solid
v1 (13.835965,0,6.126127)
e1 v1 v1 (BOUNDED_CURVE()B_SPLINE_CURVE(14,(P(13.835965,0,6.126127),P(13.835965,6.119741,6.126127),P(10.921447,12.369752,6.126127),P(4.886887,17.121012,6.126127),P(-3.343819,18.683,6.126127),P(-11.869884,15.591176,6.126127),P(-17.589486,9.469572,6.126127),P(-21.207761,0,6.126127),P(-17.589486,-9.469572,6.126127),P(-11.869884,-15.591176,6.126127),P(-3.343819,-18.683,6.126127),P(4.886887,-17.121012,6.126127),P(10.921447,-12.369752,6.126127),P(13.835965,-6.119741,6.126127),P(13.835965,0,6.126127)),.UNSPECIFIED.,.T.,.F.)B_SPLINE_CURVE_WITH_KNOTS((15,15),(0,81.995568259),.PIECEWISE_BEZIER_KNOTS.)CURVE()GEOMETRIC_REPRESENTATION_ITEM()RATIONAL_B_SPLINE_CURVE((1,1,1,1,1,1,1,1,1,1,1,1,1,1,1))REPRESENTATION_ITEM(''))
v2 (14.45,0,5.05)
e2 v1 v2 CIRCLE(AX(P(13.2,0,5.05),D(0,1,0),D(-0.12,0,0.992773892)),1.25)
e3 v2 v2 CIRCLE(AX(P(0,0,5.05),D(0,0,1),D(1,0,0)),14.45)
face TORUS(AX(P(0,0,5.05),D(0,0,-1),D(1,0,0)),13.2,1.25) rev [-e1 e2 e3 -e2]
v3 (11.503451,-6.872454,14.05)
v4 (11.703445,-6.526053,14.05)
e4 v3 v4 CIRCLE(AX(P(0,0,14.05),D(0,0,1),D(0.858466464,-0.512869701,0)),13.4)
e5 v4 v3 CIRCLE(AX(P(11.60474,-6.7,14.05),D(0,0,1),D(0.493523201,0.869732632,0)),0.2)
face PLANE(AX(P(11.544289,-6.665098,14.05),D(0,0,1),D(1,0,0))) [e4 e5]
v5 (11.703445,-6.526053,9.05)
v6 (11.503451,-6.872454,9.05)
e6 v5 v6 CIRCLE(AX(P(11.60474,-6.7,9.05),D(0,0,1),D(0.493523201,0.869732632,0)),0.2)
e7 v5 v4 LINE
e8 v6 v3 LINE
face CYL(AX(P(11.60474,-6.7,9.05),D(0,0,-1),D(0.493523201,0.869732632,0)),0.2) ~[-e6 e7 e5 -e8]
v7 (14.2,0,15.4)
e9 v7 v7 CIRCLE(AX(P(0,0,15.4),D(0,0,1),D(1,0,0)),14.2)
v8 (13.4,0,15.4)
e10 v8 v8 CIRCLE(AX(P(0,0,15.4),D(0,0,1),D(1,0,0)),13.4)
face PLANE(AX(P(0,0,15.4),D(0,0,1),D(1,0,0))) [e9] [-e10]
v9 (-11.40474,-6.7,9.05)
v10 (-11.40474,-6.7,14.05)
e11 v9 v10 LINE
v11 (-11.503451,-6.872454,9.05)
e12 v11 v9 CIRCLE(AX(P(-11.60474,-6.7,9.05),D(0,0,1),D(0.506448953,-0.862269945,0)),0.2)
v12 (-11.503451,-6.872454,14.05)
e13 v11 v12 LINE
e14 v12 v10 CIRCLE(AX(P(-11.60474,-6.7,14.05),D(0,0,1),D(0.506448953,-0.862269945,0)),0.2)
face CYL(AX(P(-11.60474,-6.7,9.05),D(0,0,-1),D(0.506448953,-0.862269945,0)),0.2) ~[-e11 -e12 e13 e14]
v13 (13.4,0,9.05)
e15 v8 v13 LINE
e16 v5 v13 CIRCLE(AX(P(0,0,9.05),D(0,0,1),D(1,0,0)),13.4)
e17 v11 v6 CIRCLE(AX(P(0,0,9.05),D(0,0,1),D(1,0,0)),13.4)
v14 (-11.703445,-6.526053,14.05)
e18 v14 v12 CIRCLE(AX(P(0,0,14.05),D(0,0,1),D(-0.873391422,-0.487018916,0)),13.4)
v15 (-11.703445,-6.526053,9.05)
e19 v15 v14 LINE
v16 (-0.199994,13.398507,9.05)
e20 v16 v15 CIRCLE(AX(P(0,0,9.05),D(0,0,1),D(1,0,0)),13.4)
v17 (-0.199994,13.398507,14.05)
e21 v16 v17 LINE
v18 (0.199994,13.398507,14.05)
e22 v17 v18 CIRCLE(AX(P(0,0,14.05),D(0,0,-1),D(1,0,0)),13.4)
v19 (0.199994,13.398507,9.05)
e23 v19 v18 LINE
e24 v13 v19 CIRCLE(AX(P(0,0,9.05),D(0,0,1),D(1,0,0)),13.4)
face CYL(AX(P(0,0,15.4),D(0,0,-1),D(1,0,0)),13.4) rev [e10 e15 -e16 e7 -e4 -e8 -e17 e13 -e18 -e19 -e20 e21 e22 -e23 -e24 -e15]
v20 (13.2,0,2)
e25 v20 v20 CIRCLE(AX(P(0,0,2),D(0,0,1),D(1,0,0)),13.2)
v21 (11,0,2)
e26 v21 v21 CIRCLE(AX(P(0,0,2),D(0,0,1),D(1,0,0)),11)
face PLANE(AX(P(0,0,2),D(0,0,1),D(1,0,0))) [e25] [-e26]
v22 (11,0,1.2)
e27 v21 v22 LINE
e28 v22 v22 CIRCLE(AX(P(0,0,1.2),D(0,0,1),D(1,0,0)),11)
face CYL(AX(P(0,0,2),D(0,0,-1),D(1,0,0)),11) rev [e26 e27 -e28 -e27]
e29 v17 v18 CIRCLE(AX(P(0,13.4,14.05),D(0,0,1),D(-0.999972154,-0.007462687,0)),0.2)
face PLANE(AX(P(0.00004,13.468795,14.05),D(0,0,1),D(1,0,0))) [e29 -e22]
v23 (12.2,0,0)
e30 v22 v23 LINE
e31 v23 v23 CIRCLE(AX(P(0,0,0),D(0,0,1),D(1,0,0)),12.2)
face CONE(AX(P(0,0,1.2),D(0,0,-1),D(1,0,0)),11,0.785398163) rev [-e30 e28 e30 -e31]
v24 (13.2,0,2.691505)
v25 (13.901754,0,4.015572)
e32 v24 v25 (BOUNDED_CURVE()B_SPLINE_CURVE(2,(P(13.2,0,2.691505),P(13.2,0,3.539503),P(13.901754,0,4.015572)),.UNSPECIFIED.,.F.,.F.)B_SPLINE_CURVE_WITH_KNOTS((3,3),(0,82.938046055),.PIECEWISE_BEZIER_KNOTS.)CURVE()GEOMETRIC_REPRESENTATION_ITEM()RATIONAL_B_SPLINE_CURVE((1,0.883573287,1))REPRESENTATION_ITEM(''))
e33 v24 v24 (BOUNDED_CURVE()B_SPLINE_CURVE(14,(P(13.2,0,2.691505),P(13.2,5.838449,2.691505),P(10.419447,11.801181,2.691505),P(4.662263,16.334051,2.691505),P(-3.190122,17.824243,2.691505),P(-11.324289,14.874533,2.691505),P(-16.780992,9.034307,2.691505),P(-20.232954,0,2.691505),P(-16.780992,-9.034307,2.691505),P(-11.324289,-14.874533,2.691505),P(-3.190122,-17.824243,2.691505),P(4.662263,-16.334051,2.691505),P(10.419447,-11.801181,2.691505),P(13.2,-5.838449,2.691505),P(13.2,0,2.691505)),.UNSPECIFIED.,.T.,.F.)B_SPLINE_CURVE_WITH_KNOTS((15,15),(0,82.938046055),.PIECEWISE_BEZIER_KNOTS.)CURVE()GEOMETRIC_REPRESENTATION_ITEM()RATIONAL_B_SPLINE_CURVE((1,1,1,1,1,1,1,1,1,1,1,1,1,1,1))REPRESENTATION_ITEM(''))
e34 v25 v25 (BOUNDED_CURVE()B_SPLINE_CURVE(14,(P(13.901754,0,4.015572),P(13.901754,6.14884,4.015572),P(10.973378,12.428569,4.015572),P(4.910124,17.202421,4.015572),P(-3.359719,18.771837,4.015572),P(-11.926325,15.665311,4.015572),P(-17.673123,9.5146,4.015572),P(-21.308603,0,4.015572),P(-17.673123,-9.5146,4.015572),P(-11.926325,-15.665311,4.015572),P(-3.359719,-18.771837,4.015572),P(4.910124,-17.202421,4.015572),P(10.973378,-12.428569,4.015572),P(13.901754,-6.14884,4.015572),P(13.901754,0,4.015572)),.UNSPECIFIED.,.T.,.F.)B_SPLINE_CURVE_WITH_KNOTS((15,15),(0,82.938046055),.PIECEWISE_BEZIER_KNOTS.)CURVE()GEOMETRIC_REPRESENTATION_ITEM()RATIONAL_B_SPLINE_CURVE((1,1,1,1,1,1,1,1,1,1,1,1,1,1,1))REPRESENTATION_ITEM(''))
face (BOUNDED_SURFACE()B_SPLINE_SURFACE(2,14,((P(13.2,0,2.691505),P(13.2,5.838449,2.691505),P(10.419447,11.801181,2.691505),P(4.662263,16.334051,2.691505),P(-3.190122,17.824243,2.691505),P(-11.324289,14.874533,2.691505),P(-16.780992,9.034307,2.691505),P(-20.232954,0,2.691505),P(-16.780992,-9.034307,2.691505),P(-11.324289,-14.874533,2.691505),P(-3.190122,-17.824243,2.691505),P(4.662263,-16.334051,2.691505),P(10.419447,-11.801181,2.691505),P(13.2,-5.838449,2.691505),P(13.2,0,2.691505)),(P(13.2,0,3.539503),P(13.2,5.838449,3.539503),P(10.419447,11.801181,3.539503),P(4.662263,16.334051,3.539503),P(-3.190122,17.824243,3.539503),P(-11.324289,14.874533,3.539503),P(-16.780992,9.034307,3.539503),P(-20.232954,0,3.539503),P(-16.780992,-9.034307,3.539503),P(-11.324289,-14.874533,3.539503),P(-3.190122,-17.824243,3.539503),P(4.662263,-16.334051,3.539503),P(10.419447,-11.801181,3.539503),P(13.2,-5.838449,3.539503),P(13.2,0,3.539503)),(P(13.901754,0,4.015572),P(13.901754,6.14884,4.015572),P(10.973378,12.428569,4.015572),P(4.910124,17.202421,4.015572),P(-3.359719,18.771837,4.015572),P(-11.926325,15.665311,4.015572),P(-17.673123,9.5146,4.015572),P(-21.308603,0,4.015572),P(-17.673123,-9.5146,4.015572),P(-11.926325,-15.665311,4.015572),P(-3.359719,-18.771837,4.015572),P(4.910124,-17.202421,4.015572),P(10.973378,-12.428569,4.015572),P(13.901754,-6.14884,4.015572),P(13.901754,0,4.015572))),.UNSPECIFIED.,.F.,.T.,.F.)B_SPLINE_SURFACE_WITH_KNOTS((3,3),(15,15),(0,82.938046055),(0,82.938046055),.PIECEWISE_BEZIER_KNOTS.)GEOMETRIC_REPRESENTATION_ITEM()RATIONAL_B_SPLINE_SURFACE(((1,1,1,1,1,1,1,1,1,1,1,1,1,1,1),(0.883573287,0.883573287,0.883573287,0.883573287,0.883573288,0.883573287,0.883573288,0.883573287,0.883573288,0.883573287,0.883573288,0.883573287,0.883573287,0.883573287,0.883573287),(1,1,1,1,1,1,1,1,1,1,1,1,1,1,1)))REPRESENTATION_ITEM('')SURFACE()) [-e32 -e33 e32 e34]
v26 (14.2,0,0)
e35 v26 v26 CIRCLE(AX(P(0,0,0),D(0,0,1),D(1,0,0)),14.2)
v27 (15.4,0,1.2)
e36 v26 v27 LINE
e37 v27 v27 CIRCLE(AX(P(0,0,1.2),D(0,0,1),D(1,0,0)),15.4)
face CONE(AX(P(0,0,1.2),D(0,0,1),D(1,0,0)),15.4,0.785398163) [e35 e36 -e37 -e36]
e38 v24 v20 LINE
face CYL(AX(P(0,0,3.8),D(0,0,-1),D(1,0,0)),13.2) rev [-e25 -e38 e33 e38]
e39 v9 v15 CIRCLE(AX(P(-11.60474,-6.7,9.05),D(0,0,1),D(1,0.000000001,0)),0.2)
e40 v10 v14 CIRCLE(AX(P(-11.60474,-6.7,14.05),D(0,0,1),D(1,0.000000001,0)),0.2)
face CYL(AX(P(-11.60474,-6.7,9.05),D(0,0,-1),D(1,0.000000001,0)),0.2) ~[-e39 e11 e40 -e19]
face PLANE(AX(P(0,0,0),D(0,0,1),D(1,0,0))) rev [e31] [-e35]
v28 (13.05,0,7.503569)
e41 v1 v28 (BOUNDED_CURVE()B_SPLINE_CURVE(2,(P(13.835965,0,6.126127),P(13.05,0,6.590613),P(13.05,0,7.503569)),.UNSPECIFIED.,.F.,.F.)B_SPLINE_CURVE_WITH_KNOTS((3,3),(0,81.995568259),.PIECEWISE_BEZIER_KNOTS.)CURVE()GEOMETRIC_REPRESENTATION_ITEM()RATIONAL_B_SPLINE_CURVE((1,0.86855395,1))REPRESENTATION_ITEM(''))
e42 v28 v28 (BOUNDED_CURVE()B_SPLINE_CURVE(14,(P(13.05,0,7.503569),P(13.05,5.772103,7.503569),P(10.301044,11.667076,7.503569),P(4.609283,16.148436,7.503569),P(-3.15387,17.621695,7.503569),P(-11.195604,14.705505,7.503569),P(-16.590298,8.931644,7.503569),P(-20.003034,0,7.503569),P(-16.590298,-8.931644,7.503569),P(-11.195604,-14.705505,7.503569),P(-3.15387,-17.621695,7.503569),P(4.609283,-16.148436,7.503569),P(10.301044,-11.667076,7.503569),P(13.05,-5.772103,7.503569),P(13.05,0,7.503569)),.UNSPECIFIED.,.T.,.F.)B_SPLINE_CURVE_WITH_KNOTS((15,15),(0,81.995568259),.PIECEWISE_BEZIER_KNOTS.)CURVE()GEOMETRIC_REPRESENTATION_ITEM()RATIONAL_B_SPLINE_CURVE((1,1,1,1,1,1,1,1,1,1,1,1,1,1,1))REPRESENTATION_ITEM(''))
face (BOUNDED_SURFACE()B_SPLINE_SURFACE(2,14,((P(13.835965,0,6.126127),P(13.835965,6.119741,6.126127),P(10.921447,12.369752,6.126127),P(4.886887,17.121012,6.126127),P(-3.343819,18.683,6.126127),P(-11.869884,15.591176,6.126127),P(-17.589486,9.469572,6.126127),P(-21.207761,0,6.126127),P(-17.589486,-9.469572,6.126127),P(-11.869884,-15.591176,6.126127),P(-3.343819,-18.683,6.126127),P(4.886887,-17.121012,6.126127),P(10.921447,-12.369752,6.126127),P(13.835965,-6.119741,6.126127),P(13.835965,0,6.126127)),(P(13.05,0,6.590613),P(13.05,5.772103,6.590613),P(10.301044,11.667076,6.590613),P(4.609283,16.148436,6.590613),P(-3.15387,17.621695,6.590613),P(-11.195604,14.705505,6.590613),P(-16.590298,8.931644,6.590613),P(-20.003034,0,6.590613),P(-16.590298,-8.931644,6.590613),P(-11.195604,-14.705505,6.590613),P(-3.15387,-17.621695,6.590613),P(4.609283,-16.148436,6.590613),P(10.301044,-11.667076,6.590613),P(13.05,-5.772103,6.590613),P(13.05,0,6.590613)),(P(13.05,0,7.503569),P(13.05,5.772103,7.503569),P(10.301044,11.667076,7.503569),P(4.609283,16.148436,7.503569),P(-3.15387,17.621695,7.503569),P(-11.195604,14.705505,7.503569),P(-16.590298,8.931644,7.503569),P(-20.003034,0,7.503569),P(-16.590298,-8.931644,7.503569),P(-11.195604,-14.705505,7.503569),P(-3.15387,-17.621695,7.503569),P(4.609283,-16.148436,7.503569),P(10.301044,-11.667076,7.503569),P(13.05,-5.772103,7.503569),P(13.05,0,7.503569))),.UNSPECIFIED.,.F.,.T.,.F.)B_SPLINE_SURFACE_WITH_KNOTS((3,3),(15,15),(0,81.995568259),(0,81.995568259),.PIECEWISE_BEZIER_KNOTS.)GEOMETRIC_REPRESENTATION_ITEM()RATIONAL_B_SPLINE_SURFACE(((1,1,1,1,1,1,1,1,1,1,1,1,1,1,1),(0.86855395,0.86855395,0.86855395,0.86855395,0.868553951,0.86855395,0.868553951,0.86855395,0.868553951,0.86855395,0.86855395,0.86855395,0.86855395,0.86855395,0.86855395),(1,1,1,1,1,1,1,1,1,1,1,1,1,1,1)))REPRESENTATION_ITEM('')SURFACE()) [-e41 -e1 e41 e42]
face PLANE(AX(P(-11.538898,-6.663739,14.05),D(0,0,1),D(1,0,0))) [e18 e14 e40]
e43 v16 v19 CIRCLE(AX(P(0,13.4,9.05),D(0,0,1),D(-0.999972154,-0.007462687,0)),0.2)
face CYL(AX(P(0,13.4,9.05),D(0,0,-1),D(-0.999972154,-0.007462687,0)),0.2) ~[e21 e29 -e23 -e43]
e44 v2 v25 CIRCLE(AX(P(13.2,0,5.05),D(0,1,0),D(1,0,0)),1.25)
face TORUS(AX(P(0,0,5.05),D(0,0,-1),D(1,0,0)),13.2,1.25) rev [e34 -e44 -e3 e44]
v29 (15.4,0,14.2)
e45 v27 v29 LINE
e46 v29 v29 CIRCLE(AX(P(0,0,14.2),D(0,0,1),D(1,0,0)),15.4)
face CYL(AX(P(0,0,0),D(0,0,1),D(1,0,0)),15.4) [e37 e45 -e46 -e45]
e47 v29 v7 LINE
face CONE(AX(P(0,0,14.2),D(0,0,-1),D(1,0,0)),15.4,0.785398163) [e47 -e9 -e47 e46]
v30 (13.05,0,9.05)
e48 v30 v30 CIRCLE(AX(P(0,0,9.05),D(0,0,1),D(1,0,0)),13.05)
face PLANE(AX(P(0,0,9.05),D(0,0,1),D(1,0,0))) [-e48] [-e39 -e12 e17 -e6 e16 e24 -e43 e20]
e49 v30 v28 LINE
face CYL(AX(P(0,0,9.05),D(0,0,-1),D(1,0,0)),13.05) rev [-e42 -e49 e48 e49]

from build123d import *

# Parameters (mm, degrees)
F2_SIZE  = 1.2
F3_R     = 1.6
F5_DEPTH = 5


# Not quite as in the source:
# - a feature names something its author has since deleted; it is built from what else it names


with BuildPart() as f1:
    # F0 (on Front) → F1 (revolve)
    with BuildSketch(Plane.XZ):
        with BuildLine():
            ThreePointArc((13.05, 6.2909673646), (14.0291561976, 5.9854143467), (14.45, 5.05))
            ThreePointArc((14.45, 5.05), (14.0838834765, 4.1661165235), (13.2, 3.8))
            Line((13.2, 3.8), (13.2, 2))
            Line((13.2, 2), (11, 2))
            Line((11, 2), (11, 0))
            Line((11, 0), (15.4, 0))
            Line((15.4, 0), (15.4, 15.4))
            Line((15.4, 15.4), (13.4, 15.4))
            Line((13.4, 15.4), (13.4, 9.05))
            Line((13.4, 9.05), (13.05, 9.05))
            Line((13.05, 9.05), (13.05, 6.2909673646))
        make_face()
    revolve(axis=Axis((0, 0, 9.4043305144), (0, 0, 1)))

    # F2
    f2_edges = [f1.edges().sort_by_distance(p)[0] for p in [
        (-11, 0, 0),
        (-15.4, 0, 0),
        (-15.4, 0, 15.4),
    ]]
    chamfer(f2_edges, length=F2_SIZE)

    # F3
    f3_edges = [f1.edges().sort_by_distance(p)[0] for p in [
        (-13.05, 0, 6.290967),
        (-13.2, 0, 3.8),
    ]]
    fillet(f3_edges, radius=F3_R)

    # F4 (on face) → F5 (join)
    with BuildSketch(Plane.XY.offset(9.05)):
        with BuildLine():
            ThreePointArc((0.1999944308, 13.3985074627), (0.1999986077, 13.3992537261), (0.2, 13.4))
            ThreePointArc((0.2, 13.4), (-0.0007462739, 13.5999986077), (-0.1999944308, 13.3985074627))
            ThreePointArc((-0.1999944308, 13.3985074627), (0, 13.4), (0.1999944308, 13.3985074627))
        make_face()
        with BuildLine():
            ThreePointArc((0.1999944308, 13.3985074627), (0, 13.4), (-0.1999944308, 13.3985074627))
            ThreePointArc((-0.1999944308, 13.3985074627), (0, 13.2), (0.1999944308, 13.3985074627))
        make_face()
        with BuildLine():
            ThreePointArc((-11.4047404107, -6.7), (-11.5040948148, -6.527169262), (-11.7034450509, -6.5260534737))
            ThreePointArc((-11.7034450509, -6.5260534737), (-11.6047404107, -6.7), (-11.5034506201, -6.872453989))
            ThreePointArc((-11.5034506201, -6.872453989), (-11.4311633988, -6.7993530117), (-11.4047404107, -6.7))
        make_face()
        with BuildLine():
            ThreePointArc((11.5034506201, -6.872453989), (11.6047404107, -6.7), (11.7034450509, -6.5260534737))
            ThreePointArc((11.7034450509, -6.5260534737), (11.43153533, -6.6), (11.5034506201, -6.872453989))
        make_face()
    extrude(amount=F5_DEPTH)


solid = f1.part
